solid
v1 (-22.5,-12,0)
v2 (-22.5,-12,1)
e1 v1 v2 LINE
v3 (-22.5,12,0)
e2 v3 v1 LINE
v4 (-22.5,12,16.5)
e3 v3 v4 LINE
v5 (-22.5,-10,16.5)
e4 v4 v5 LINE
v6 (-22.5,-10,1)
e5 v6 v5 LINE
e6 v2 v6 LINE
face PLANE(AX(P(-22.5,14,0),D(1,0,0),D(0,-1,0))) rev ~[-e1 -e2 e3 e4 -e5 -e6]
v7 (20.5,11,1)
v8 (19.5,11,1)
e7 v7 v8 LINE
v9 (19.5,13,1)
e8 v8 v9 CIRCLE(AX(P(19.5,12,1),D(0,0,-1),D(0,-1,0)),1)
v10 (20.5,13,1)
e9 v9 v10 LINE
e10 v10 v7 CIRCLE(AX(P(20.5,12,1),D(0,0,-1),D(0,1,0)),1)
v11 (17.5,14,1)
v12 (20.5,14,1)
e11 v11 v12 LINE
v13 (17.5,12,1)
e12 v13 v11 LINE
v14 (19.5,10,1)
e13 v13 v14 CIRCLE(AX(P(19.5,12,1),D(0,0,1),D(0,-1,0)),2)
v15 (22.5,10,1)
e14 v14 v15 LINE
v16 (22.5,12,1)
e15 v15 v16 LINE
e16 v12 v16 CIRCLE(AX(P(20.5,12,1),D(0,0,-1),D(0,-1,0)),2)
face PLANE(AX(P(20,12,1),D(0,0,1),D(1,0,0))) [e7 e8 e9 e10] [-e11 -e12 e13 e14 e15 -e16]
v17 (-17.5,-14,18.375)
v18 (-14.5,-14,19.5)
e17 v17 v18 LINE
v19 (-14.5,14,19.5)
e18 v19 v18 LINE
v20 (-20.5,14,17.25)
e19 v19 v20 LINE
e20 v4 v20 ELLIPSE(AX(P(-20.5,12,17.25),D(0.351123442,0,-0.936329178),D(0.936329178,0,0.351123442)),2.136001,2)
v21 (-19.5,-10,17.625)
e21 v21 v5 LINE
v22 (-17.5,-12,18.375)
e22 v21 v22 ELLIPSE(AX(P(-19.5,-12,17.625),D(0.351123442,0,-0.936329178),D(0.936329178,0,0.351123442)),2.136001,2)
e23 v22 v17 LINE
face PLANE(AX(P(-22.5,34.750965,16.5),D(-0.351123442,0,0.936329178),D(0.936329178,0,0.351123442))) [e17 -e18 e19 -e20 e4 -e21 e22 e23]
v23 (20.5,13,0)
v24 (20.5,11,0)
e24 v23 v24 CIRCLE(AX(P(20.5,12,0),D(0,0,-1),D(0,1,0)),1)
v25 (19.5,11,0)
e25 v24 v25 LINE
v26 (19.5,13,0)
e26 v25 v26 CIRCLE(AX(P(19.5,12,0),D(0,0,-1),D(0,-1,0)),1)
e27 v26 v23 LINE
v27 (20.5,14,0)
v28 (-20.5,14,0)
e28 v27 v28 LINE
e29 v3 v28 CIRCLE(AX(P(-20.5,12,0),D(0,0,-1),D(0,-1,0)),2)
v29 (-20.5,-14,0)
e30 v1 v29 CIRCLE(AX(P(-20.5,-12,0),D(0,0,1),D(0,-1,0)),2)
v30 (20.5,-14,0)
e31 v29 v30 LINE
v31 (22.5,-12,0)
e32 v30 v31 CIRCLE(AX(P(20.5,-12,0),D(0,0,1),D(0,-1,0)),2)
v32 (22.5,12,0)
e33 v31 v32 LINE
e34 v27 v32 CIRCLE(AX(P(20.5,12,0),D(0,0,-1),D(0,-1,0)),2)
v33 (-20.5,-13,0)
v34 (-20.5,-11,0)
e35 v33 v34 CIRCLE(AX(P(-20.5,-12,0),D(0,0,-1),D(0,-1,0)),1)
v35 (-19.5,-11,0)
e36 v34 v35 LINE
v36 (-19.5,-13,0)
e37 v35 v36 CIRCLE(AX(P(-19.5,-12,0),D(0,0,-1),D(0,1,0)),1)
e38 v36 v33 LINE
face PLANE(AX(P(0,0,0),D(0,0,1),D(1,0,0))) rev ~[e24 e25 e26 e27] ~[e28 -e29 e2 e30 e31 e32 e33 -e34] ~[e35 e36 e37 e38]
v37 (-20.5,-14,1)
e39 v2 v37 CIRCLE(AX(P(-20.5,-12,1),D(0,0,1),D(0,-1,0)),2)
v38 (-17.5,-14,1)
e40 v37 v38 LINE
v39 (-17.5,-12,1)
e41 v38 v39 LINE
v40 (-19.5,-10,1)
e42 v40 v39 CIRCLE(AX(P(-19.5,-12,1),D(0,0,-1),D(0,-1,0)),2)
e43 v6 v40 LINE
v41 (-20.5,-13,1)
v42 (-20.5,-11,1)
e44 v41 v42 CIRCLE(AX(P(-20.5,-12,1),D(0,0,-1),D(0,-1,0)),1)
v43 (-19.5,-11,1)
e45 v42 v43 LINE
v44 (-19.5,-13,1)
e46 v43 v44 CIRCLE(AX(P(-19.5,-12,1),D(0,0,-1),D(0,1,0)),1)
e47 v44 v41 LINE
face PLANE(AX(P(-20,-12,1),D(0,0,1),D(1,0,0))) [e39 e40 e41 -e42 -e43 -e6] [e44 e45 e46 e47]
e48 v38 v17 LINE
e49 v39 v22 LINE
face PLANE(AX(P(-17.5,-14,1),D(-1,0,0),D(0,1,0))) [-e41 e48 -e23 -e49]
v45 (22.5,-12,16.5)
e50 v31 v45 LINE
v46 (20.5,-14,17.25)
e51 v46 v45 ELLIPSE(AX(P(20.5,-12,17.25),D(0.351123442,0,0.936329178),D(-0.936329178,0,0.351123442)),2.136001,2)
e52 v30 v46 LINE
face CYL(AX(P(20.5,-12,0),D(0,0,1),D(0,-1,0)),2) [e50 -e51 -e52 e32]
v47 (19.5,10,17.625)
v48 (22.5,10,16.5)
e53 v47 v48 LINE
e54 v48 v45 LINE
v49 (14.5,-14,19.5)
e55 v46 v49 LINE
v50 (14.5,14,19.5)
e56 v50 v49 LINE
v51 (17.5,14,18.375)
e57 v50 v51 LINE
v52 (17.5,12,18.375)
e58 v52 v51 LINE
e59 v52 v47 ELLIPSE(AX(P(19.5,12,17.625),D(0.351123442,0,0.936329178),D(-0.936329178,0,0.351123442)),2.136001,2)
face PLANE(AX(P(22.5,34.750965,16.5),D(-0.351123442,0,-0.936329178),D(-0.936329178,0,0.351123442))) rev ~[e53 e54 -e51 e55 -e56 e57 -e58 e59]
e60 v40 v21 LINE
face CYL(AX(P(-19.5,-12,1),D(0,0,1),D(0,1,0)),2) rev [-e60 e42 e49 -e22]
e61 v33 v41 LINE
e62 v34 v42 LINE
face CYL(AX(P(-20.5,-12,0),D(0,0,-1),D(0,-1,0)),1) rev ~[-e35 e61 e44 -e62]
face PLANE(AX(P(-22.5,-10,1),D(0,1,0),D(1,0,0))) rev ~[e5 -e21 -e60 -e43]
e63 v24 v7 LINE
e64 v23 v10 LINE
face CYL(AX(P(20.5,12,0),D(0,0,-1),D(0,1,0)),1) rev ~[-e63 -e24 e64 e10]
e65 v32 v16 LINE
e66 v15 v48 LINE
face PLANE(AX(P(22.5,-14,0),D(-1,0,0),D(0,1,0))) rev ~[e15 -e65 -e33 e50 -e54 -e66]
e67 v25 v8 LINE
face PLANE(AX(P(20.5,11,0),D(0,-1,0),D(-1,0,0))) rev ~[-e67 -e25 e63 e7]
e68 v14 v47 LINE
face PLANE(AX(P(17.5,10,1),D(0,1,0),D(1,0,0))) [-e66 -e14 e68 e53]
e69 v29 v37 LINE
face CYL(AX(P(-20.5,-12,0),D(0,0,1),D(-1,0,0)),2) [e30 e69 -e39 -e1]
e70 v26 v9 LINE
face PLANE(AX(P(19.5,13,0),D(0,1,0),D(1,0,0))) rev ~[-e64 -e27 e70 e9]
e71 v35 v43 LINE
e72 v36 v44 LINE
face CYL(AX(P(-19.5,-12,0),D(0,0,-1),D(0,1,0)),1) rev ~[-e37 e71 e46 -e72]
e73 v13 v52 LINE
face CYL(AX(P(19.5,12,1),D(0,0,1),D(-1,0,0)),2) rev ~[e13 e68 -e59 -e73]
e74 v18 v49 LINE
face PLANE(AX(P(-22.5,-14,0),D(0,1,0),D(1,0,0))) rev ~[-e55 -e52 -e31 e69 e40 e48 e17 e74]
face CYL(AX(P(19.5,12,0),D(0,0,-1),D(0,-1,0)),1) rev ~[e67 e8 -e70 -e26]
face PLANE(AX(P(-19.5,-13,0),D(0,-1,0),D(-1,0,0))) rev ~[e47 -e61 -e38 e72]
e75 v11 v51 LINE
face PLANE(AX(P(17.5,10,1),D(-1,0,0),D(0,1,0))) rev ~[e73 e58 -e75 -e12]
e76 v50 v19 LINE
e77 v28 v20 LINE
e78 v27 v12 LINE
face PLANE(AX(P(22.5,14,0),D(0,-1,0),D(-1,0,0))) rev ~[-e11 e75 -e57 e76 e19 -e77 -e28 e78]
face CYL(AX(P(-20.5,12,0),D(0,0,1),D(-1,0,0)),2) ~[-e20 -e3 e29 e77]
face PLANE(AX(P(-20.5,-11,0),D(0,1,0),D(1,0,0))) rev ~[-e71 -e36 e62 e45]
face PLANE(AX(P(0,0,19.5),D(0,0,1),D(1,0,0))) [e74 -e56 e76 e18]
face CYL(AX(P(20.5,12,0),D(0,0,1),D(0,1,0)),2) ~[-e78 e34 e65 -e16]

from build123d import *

# Parameters (mm, degrees)
F0_W        = 5
F0_H        = 4
F1_DEPTH    = 19.5
F2_T1_DEPTH = 69.5019292892
F3_START    = 1
F3_DEPTH    = 24
F4_R        = 2


# Not quite as in the source:
# - a fillet or chamfer that OpenCascade refuses, or shapes differently, is made with other operations: its cross-section is extruded or revolved along the edge and cut away or added


with BuildPart() as f1:
    # F0 (on Top) → F1 (new body)
    with BuildSketch(Plane.XY):
        Polygon((17.5, 14), (-22.5, 14), (-22.5, -10), (-17.5, -10), (-17.5, -14), (22.5, -14), (22.5, 10), (17.5, 10), align=None)
        with Locations((20, 12)):
            Rectangle(F0_W, F0_H)
        with BuildLine():
            ThreePointArc((19.5, 11), (18.5, 12), (19.5, 13))
            Line((19.5, 13), (20.5, 13))
            ThreePointArc((20.5, 13), (21.5, 12), (20.5, 11))
            Line((20.5, 11), (19.5, 11))
        make_face(mode=Mode.SUBTRACT)
        with Locations((-20, -12)):
            Rectangle(F0_W, F0_H)
        with BuildLine():
            ThreePointArc((-20.5, -13), (-21.5, -12), (-20.5, -11))
            Line((-20.5, -11), (-19.5, -11))
            ThreePointArc((-19.5, -11), (-18.5, -12), (-19.5, -13))
            Line((-19.5, -13), (-20.5, -13))
        make_face(mode=Mode.SUBTRACT)
    extrude(amount=F1_DEPTH)

    # F2: chamfer of 3 x 8 on 2 edges, made by hand

    # F2_s2 → F2_t1 (cut)
    with BuildSketch(Plane.XZ.offset(-34.7509646446)):
        Polygon((-22.5, 16.5), (-14.5, 19.5), (-22.5, 19.5), align=None)
        Polygon((22.5, 16.5), (14.5, 19.5), (22.5, 19.5), align=None)
    extrude(amount=F2_T1_DEPTH, mode=Mode.SUBTRACT)

    # F0 (on Top) → F3 (cut)
    with BuildSketch(Plane.XY.offset(F3_START)):
        with Locations((-20, -12)):
            Rectangle(F0_W, F0_H)
        with BuildLine():
            ThreePointArc((-20.5, -13), (-21.5, -12), (-20.5, -11))
            Line((-20.5, -11), (-19.5, -11))
            ThreePointArc((-19.5, -11), (-18.5, -12), (-19.5, -13))
            Line((-19.5, -13), (-20.5, -13))
        make_face(mode=Mode.SUBTRACT)
        with Locations((20, 12)):
            Rectangle(F0_W, F0_H)
        with BuildLine():
            ThreePointArc((19.5, 11), (18.5, 12), (19.5, 13))
            Line((19.5, 13), (20.5, 13))
            ThreePointArc((20.5, 13), (21.5, 12), (20.5, 11))
            Line((20.5, 11), (19.5, 11))
        make_face(mode=Mode.SUBTRACT)
    extrude(amount=F3_DEPTH, mode=Mode.SUBTRACT)

    # F4
    f4_edges = [f1.edges().sort_by_distance(p)[0] for p in [
        (-17.5, -10, 9.6875),
        (17.5, 10, 9.6875),
        (22.5, -14, 8.25),
        (22.5, 14, 0.5),
        (-22.5, 14, 8.25),
        (-22.5, -14, 0.5),
    ]]
    fillet(f4_edges, radius=F4_R)


solid = f1.part
